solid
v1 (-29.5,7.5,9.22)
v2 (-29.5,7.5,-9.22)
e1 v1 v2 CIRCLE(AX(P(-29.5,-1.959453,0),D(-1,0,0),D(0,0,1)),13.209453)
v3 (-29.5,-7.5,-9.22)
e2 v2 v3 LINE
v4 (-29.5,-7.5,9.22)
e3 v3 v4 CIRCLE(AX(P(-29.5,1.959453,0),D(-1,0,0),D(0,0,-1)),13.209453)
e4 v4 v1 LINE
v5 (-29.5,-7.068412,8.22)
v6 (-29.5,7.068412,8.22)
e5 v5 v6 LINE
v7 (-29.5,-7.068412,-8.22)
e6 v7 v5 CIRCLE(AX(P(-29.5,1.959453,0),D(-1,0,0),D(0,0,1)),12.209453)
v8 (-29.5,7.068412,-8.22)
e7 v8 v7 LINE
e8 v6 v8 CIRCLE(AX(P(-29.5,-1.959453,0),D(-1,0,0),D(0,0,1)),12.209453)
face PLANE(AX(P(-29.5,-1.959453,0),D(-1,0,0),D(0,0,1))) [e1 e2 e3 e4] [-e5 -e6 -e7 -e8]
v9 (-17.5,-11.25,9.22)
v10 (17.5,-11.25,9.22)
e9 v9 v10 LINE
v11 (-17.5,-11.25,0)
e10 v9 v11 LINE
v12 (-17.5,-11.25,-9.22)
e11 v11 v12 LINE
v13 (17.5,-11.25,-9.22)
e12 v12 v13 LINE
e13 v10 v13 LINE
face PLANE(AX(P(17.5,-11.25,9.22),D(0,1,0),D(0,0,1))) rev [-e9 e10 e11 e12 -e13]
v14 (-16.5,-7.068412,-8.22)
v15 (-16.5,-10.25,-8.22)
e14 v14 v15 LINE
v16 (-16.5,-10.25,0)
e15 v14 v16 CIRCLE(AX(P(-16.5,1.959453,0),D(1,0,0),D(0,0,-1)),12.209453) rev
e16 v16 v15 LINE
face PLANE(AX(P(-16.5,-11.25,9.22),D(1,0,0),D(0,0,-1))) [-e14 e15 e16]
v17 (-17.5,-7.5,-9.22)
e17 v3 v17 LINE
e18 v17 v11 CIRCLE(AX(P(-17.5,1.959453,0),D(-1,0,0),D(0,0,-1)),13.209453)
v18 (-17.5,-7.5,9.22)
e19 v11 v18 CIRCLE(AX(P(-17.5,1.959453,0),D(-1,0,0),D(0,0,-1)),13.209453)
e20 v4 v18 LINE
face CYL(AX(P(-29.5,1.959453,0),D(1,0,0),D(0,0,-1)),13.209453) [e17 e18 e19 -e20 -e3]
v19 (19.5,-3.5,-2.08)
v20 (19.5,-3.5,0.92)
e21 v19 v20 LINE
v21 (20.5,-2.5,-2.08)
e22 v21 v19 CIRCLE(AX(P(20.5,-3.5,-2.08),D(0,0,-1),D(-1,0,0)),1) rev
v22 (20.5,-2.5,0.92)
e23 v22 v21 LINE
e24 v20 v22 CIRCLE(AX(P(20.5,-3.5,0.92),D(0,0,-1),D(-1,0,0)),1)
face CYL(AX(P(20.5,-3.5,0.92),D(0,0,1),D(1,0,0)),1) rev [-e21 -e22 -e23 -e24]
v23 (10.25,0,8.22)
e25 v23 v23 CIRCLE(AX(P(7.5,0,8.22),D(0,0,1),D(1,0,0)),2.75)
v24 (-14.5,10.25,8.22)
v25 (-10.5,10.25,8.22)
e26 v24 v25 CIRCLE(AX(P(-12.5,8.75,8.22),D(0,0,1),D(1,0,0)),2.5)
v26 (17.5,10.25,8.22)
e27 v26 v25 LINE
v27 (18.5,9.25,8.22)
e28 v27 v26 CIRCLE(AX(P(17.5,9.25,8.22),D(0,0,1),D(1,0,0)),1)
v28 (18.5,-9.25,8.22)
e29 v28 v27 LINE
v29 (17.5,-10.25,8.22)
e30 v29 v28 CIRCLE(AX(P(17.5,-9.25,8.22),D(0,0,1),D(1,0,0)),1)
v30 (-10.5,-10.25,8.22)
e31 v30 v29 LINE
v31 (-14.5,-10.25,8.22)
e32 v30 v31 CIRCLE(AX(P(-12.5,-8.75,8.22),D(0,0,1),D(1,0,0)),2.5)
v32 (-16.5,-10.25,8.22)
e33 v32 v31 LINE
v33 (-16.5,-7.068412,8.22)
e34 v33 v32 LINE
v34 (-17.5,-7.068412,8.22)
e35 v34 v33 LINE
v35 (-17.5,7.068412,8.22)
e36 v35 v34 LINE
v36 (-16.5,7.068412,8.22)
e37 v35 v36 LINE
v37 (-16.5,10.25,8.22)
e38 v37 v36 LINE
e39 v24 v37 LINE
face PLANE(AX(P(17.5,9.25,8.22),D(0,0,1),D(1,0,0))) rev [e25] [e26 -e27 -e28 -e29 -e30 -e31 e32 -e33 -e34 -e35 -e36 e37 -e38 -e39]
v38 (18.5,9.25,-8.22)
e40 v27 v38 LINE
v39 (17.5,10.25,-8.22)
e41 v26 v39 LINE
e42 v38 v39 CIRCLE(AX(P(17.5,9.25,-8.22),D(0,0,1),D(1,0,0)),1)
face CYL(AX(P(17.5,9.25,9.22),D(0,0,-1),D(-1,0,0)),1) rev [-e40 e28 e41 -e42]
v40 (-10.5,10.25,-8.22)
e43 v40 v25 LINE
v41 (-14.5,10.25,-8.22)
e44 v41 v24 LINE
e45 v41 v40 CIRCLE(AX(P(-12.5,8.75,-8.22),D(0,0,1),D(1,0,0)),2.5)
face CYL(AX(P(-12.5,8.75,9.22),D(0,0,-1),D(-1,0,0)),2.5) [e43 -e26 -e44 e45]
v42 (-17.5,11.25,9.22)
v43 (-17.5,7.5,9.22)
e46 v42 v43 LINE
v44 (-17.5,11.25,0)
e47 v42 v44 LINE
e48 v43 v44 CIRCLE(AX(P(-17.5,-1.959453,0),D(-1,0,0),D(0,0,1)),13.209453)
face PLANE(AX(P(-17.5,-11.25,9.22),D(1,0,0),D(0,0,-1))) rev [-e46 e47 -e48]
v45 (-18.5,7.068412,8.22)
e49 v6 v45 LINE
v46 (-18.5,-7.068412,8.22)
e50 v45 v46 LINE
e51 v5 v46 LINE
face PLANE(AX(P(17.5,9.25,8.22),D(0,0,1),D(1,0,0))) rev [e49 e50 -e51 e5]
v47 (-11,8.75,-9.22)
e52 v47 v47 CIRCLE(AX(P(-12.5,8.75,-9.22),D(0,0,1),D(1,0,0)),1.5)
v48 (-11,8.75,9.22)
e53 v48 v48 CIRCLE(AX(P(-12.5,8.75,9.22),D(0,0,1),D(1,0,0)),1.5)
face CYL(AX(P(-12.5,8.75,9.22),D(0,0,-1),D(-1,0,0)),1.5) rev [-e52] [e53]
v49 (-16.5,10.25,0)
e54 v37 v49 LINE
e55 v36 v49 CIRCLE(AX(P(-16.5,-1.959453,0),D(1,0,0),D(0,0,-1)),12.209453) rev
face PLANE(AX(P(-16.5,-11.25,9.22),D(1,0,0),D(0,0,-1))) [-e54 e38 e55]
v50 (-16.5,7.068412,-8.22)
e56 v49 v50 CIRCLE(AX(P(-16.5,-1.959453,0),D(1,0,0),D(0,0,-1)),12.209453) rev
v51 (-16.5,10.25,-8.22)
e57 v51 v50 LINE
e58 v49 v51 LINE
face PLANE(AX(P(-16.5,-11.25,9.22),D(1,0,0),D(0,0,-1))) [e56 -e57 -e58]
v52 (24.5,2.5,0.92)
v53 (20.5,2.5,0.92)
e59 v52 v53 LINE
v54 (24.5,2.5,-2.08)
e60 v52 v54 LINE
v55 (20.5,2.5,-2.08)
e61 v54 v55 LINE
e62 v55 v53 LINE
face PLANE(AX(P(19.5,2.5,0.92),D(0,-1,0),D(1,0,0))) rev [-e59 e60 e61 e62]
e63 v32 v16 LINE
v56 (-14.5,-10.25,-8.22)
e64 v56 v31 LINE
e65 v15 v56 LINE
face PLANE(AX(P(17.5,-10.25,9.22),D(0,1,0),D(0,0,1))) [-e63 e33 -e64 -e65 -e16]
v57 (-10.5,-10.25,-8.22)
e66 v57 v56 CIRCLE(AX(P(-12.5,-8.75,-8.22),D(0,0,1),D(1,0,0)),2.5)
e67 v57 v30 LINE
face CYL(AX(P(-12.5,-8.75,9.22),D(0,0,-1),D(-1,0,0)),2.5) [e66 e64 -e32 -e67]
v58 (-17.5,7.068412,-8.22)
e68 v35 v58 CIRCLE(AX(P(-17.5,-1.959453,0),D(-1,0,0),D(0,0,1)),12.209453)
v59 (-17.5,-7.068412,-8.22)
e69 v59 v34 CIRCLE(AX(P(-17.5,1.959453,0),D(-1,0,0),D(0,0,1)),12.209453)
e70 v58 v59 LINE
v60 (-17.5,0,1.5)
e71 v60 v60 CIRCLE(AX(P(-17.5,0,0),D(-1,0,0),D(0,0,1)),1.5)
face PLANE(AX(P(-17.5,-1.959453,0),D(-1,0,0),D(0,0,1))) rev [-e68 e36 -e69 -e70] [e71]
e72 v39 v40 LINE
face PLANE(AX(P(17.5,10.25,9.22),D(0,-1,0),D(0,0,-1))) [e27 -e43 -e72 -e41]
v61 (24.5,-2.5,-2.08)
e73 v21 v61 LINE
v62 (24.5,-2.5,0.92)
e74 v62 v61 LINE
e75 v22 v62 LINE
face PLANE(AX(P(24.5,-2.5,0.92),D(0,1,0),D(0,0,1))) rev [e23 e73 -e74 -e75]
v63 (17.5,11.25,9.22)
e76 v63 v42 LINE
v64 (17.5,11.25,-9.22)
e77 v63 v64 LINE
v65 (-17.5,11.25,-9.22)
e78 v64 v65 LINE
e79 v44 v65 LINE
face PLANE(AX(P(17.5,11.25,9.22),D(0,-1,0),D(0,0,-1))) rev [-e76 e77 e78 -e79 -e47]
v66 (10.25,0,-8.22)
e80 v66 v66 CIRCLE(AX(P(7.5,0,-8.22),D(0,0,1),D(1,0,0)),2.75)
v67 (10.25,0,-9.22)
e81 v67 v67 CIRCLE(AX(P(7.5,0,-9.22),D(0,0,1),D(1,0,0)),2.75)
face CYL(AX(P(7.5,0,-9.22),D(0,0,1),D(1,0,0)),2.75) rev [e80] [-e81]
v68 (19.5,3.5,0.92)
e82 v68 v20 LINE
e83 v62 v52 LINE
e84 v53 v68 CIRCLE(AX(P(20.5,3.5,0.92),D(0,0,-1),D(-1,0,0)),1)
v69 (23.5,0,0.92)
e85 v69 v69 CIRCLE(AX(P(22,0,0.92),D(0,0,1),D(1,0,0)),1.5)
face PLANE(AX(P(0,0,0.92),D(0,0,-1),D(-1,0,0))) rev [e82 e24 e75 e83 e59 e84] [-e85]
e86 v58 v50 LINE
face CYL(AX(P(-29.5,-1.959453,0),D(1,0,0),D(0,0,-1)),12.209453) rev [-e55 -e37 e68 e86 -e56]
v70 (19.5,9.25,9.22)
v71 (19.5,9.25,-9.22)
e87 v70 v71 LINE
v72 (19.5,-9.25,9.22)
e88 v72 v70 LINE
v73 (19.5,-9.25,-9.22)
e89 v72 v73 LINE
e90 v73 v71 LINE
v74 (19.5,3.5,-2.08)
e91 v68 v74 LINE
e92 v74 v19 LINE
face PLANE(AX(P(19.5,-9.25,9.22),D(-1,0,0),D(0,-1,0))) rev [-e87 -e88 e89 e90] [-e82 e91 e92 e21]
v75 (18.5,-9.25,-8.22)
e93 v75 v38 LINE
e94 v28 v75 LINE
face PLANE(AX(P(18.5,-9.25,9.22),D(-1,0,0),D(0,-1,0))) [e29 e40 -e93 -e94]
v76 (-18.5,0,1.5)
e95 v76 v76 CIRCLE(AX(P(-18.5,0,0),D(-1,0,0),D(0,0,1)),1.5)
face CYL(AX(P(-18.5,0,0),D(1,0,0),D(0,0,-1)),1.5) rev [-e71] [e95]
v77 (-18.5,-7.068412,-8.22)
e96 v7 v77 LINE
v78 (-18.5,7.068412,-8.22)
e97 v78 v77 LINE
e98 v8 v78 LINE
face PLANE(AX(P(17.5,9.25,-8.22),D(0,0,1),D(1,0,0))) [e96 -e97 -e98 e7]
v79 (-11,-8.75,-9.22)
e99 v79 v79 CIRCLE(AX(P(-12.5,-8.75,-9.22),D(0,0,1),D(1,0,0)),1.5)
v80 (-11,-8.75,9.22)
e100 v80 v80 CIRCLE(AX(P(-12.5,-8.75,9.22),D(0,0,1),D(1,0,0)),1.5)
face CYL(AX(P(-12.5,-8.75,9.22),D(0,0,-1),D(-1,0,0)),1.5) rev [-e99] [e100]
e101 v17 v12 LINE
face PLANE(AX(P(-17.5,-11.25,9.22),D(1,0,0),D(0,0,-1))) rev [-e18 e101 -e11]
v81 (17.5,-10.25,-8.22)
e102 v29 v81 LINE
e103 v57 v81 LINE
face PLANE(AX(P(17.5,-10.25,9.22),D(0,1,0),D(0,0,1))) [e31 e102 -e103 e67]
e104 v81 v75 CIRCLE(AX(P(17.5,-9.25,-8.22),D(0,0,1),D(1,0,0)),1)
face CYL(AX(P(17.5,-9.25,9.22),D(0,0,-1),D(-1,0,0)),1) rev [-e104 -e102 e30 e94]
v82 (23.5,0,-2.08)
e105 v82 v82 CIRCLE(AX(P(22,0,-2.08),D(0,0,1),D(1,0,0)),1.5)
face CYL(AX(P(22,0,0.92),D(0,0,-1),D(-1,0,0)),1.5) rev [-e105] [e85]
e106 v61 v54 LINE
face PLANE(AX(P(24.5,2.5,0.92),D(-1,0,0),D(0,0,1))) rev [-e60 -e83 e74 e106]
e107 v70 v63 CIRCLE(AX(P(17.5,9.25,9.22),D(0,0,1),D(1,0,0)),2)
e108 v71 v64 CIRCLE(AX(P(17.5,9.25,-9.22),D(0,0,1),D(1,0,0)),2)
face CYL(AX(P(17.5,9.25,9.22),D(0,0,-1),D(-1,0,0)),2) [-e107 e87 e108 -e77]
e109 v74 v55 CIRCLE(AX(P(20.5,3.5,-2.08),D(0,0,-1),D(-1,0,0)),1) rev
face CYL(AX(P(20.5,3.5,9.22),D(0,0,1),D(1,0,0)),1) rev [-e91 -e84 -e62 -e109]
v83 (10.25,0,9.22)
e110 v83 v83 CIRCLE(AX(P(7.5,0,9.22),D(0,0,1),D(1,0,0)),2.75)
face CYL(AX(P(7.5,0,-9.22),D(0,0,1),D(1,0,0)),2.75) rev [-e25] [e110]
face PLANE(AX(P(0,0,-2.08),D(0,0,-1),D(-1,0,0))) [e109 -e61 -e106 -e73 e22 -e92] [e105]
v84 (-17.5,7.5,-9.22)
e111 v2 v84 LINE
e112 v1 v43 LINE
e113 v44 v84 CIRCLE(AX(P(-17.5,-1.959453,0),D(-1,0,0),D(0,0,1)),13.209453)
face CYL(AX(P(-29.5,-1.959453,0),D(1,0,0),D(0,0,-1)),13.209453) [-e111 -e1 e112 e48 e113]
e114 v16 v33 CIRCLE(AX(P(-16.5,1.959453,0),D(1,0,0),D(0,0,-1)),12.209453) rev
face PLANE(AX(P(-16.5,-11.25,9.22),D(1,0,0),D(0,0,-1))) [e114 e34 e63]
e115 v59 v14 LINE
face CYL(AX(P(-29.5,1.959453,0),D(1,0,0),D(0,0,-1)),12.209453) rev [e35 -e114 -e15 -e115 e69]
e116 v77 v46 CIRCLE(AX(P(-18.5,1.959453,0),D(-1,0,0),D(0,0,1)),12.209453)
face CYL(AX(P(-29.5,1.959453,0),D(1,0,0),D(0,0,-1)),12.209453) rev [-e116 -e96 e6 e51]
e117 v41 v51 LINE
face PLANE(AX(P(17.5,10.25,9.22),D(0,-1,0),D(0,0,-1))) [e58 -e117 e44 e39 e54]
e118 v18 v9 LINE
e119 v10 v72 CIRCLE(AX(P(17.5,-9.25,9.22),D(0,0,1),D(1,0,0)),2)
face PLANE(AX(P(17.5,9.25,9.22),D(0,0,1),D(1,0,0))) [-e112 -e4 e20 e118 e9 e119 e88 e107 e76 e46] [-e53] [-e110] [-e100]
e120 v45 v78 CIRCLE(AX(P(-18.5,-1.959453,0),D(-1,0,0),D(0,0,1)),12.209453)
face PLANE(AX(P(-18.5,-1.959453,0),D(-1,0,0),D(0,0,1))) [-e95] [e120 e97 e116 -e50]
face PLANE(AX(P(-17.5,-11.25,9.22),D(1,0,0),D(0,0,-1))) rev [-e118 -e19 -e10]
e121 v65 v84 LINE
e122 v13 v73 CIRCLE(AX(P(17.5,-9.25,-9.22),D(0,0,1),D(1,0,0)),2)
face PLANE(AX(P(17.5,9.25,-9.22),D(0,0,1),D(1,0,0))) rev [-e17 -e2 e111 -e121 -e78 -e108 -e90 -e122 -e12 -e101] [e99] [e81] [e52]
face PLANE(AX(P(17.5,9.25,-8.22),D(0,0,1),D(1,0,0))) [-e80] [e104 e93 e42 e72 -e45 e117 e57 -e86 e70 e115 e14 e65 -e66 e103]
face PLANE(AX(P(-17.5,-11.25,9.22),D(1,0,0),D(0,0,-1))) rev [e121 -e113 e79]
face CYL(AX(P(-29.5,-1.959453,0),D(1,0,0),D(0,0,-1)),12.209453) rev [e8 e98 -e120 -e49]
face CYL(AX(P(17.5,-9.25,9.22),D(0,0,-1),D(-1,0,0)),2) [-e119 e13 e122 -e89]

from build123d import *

# Parameters (mm, degrees)
SKETCH1_R                = 1.5
BOSS_EXTRUDE1_DEPTH      = 9.22
BOSS_EXTRUDE2_DEPTH      = 12
SHELL1_START             = -10
SHELL1_OUTLINE_W         = 20.5
SHELL1_OUTLINE_H         = 16.44
SHELL1_DEPTH             = 27.5
SHELL1_START_2           = -29.5
SHELL1_2_DEPTH           = 14.5
SHELL1_START_3           = -16.5
SHELL1_3_DEPTH           = 1.5
SHELL1_START_4           = -8.22
SHELL1_4_DEPTH           = 16.44
SKETCH3_R                = 1.5
BOSS_EXTRUDE3_DEPTH      = 1
BOSS_EXTRUDE4_DEPTH      = 1.5
BOSS_EXTRUDE4_DEPTH_BACK = 1.5
SKETCH6_W                = 5
SKETCH6_H                = 5
SKETCH6_R                = 1.5
SKETCH7_R                = 2.75
CUT_EXTRUDE1_DEPTH       = 37.562906066
FILLET1_R                = 1


with BuildPart() as part:
    # Sketch1 → Boss-Extrude1 (new, symmetric)
    with BuildSketch(Plane.XY):
        with BuildLine():
            Line((17.5, -11.25), (-17.5, -11.25))
            Line((-17.5, -11.25), (-17.5, 11.25))
            Line((-17.5, 11.25), (17.5, 11.25))
            ThreePointArc((17.5, 11.25), (18.914213562, 10.664213562), (19.5, 9.25))
            Line((19.5, 9.25), (19.5, -9.25))
            ThreePointArc((19.5, -9.25), (18.914213562, -10.664213562), (17.5, -11.25))
        make_face()
        with Locations((-12.5, 8.75)):
            Circle(SKETCH1_R, mode=Mode.SUBTRACT)
        with Locations((-12.5, -8.75)):
            Circle(SKETCH1_R, mode=Mode.SUBTRACT)
    extrude(amount=BOSS_EXTRUDE1_DEPTH, both=True)

    # Sketch2 → Boss-Extrude2 (add)
    with BuildSketch(Plane.ZY.offset(17.5)):
        with BuildLine():
            Line((9.22, -7.5), (9.22, 7.5))
            ThreePointArc((9.22, 7.5), (0, 11.25), (-9.22, 7.5))
            Line((-9.22, 7.5), (-9.22, -7.5))
            ThreePointArc((-9.22, -7.5), (0, -11.25), (9.22, -7.5))
        make_face()
    extrude(amount=BOSS_EXTRUDE2_DEPTH)

    # Shell1: read off the stored shape, not the designer's step
    # Shell1 outline → Shell1 (cut)
    with BuildSketch(Plane.YZ.offset(SHELL1_START)):
        Rectangle(SHELL1_OUTLINE_W, SHELL1_OUTLINE_H)
    extrude(amount=SHELL1_DEPTH, mode=Mode.SUBTRACT)

    # Shell1 2 outline → Shell1 2 (cut)
    with BuildSketch(Plane.YZ.offset(SHELL1_START_2)):
        with BuildLine():
            ThreePointArc((7.068411902, -8.22), (10.25, 0), (7.068411902, 8.22))
            Line((7.068411902, 8.22), (-7.068411902, 8.22))
            ThreePointArc((-7.068411902, 8.22), (-10.25, 0), (-7.068411902, -8.22))
            Line((-7.068411902, -8.22), (7.068411902, -8.22))
        make_face()
    extrude(amount=SHELL1_2_DEPTH, mode=Mode.SUBTRACT)

    # Shell1 3 outline → Shell1 3 (cut)
    with BuildSketch(Plane.YZ.offset(SHELL1_START_3)):
        with BuildLine():
            Line((10.25, 0), (10.25, 8.22))
            Line((10.25, 8.22), (7.068411902, 8.22))
            ThreePointArc((7.068411902, 8.22), (9.426855331, 4.407122157), (10.25, 0))
        make_face()
        with BuildLine():
            Line((10.25, -8.22), (10.25, 0))
            ThreePointArc((10.25, 0), (9.426855331, -4.407122157), (7.068411902, -8.22))
            Line((7.068411902, -8.22), (10.25, -8.22))
        make_face()
        with BuildLine():
            ThreePointArc((-10.25, 0), (-9.426855331, 4.407122157), (-7.068411902, 8.22))
            Line((-7.068411902, 8.22), (-10.25, 8.22))
            Line((-10.25, 8.22), (-10.25, 0))
        make_face()
        with BuildLine():
            Line((-10.25, -8.22), (-7.068411902, -8.22))
            ThreePointArc((-7.068411902, -8.22), (-9.426855331, -4.407122157), (-10.25, 0))
            Line((-10.25, 0), (-10.25, -8.22))
        make_face()
    extrude(amount=SHELL1_3_DEPTH, mode=Mode.SUBTRACT)

    # Shell1 4 outline → Shell1 4 (cut)
    with BuildSketch(Plane.XY.offset(SHELL1_START_4)):
        with BuildLine():
            ThreePointArc((-14.5, -10.25), (-14.871708245, -9.540569415), (-15, -8.75))
            Line((-15, -8.75), (-15, -10.25))
            Line((-15, -10.25), (-14.5, -10.25))
        make_face()
        with BuildLine():
            ThreePointArc((-10, 8.75), (-12.499999993, 6.25), (-15, 8.749999987))
            Line((-15, 8.749999987), (-15, -8.75))
            ThreePointArc((-15, -8.75), (-12.5, -6.25), (-10, -8.75))
            Line((-10, -8.75), (-10, 8.75))
        make_face()
        with BuildLine():
            Line((-14.5, 10.25), (-15, 10.25))
            Line((-15, 10.25), (-15, 8.749999987))
            ThreePointArc((-15, 8.749999987), (-14.871708247, 9.540569409), (-14.5, 10.25))
        make_face()
        with BuildLine():
            ThreePointArc((-10.5, 10.25), (-10.128291755, 9.540569415), (-10, 8.75))
            Line((-10, 8.75), (-10, 10.25))
            Line((-10, 10.25), (-10.5, 10.25))
        make_face()
        with BuildLine():
            Line((-10, -10.25), (-10, -8.75))
            ThreePointArc((-10, -8.75), (-10.128291755, -9.540569415), (-10.5, -10.25))
            Line((-10.5, -10.25), (-10, -10.25))
        make_face()
        with BuildLine():
            ThreePointArc((18.5, 9.25), (18.207106781, 9.957106781), (17.5, 10.25))
            Line((17.5, 10.25), (17.5, -10.25))
            ThreePointArc((17.5, -10.25), (18.207106781, -9.957106781), (18.5, -9.25))
            Line((18.5, -9.25), (18.5, 9.25))
        make_face()
    extrude(amount=SHELL1_4_DEPTH, mode=Mode.SUBTRACT)

    # Sketch3 → Boss-Extrude3 (add)
    with BuildSketch(Plane.ZY.offset(17.5)):
        with BuildLine():
            Line((-9.22, 7.5), (-9.22, -7.5))
            ThreePointArc((-9.22, -7.5), (0, -11.25), (9.22, -7.5))
            Line((9.22, -7.5), (9.22, 7.5))
            ThreePointArc((9.22, 7.5), (0, 11.25), (-9.22, 7.5))
        make_face()
        Circle(SKETCH3_R, mode=Mode.SUBTRACT)
    extrude(amount=BOSS_EXTRUDE3_DEPTH)

    # Sketch6 → Boss-Extrude4 (add, two sides: drawn at the far end of the back side and taken through both)
    with BuildSketch(Plane.XY.offset(-0.58).offset(-BOSS_EXTRUDE4_DEPTH_BACK)):
        with Locations((22, 0)):
            Rectangle(SKETCH6_W, SKETCH6_H)
        with Locations((22, 0)):
            Circle(SKETCH6_R, mode=Mode.SUBTRACT)
    extrude(amount=BOSS_EXTRUDE4_DEPTH + BOSS_EXTRUDE4_DEPTH_BACK)

    # Sketch7 → Cut-Extrude1 (cut, through all)
    with BuildSketch(Plane.XY.offset(9.22)):
        with Locations((7.5, 0)):
            Circle(SKETCH7_R)
    extrude(amount=-CUT_EXTRUDE1_DEPTH, mode=Mode.SUBTRACT)

    # Fillet1
    fillet1_edges = [part.edges().sort_by_distance(p)[0] for p in [
        (19.5, 2.5, -0.58),
        (19.5, -2.5, -0.58),
    ]]
    fillet(fillet1_edges, radius=FILLET1_R)


solid = part.part
